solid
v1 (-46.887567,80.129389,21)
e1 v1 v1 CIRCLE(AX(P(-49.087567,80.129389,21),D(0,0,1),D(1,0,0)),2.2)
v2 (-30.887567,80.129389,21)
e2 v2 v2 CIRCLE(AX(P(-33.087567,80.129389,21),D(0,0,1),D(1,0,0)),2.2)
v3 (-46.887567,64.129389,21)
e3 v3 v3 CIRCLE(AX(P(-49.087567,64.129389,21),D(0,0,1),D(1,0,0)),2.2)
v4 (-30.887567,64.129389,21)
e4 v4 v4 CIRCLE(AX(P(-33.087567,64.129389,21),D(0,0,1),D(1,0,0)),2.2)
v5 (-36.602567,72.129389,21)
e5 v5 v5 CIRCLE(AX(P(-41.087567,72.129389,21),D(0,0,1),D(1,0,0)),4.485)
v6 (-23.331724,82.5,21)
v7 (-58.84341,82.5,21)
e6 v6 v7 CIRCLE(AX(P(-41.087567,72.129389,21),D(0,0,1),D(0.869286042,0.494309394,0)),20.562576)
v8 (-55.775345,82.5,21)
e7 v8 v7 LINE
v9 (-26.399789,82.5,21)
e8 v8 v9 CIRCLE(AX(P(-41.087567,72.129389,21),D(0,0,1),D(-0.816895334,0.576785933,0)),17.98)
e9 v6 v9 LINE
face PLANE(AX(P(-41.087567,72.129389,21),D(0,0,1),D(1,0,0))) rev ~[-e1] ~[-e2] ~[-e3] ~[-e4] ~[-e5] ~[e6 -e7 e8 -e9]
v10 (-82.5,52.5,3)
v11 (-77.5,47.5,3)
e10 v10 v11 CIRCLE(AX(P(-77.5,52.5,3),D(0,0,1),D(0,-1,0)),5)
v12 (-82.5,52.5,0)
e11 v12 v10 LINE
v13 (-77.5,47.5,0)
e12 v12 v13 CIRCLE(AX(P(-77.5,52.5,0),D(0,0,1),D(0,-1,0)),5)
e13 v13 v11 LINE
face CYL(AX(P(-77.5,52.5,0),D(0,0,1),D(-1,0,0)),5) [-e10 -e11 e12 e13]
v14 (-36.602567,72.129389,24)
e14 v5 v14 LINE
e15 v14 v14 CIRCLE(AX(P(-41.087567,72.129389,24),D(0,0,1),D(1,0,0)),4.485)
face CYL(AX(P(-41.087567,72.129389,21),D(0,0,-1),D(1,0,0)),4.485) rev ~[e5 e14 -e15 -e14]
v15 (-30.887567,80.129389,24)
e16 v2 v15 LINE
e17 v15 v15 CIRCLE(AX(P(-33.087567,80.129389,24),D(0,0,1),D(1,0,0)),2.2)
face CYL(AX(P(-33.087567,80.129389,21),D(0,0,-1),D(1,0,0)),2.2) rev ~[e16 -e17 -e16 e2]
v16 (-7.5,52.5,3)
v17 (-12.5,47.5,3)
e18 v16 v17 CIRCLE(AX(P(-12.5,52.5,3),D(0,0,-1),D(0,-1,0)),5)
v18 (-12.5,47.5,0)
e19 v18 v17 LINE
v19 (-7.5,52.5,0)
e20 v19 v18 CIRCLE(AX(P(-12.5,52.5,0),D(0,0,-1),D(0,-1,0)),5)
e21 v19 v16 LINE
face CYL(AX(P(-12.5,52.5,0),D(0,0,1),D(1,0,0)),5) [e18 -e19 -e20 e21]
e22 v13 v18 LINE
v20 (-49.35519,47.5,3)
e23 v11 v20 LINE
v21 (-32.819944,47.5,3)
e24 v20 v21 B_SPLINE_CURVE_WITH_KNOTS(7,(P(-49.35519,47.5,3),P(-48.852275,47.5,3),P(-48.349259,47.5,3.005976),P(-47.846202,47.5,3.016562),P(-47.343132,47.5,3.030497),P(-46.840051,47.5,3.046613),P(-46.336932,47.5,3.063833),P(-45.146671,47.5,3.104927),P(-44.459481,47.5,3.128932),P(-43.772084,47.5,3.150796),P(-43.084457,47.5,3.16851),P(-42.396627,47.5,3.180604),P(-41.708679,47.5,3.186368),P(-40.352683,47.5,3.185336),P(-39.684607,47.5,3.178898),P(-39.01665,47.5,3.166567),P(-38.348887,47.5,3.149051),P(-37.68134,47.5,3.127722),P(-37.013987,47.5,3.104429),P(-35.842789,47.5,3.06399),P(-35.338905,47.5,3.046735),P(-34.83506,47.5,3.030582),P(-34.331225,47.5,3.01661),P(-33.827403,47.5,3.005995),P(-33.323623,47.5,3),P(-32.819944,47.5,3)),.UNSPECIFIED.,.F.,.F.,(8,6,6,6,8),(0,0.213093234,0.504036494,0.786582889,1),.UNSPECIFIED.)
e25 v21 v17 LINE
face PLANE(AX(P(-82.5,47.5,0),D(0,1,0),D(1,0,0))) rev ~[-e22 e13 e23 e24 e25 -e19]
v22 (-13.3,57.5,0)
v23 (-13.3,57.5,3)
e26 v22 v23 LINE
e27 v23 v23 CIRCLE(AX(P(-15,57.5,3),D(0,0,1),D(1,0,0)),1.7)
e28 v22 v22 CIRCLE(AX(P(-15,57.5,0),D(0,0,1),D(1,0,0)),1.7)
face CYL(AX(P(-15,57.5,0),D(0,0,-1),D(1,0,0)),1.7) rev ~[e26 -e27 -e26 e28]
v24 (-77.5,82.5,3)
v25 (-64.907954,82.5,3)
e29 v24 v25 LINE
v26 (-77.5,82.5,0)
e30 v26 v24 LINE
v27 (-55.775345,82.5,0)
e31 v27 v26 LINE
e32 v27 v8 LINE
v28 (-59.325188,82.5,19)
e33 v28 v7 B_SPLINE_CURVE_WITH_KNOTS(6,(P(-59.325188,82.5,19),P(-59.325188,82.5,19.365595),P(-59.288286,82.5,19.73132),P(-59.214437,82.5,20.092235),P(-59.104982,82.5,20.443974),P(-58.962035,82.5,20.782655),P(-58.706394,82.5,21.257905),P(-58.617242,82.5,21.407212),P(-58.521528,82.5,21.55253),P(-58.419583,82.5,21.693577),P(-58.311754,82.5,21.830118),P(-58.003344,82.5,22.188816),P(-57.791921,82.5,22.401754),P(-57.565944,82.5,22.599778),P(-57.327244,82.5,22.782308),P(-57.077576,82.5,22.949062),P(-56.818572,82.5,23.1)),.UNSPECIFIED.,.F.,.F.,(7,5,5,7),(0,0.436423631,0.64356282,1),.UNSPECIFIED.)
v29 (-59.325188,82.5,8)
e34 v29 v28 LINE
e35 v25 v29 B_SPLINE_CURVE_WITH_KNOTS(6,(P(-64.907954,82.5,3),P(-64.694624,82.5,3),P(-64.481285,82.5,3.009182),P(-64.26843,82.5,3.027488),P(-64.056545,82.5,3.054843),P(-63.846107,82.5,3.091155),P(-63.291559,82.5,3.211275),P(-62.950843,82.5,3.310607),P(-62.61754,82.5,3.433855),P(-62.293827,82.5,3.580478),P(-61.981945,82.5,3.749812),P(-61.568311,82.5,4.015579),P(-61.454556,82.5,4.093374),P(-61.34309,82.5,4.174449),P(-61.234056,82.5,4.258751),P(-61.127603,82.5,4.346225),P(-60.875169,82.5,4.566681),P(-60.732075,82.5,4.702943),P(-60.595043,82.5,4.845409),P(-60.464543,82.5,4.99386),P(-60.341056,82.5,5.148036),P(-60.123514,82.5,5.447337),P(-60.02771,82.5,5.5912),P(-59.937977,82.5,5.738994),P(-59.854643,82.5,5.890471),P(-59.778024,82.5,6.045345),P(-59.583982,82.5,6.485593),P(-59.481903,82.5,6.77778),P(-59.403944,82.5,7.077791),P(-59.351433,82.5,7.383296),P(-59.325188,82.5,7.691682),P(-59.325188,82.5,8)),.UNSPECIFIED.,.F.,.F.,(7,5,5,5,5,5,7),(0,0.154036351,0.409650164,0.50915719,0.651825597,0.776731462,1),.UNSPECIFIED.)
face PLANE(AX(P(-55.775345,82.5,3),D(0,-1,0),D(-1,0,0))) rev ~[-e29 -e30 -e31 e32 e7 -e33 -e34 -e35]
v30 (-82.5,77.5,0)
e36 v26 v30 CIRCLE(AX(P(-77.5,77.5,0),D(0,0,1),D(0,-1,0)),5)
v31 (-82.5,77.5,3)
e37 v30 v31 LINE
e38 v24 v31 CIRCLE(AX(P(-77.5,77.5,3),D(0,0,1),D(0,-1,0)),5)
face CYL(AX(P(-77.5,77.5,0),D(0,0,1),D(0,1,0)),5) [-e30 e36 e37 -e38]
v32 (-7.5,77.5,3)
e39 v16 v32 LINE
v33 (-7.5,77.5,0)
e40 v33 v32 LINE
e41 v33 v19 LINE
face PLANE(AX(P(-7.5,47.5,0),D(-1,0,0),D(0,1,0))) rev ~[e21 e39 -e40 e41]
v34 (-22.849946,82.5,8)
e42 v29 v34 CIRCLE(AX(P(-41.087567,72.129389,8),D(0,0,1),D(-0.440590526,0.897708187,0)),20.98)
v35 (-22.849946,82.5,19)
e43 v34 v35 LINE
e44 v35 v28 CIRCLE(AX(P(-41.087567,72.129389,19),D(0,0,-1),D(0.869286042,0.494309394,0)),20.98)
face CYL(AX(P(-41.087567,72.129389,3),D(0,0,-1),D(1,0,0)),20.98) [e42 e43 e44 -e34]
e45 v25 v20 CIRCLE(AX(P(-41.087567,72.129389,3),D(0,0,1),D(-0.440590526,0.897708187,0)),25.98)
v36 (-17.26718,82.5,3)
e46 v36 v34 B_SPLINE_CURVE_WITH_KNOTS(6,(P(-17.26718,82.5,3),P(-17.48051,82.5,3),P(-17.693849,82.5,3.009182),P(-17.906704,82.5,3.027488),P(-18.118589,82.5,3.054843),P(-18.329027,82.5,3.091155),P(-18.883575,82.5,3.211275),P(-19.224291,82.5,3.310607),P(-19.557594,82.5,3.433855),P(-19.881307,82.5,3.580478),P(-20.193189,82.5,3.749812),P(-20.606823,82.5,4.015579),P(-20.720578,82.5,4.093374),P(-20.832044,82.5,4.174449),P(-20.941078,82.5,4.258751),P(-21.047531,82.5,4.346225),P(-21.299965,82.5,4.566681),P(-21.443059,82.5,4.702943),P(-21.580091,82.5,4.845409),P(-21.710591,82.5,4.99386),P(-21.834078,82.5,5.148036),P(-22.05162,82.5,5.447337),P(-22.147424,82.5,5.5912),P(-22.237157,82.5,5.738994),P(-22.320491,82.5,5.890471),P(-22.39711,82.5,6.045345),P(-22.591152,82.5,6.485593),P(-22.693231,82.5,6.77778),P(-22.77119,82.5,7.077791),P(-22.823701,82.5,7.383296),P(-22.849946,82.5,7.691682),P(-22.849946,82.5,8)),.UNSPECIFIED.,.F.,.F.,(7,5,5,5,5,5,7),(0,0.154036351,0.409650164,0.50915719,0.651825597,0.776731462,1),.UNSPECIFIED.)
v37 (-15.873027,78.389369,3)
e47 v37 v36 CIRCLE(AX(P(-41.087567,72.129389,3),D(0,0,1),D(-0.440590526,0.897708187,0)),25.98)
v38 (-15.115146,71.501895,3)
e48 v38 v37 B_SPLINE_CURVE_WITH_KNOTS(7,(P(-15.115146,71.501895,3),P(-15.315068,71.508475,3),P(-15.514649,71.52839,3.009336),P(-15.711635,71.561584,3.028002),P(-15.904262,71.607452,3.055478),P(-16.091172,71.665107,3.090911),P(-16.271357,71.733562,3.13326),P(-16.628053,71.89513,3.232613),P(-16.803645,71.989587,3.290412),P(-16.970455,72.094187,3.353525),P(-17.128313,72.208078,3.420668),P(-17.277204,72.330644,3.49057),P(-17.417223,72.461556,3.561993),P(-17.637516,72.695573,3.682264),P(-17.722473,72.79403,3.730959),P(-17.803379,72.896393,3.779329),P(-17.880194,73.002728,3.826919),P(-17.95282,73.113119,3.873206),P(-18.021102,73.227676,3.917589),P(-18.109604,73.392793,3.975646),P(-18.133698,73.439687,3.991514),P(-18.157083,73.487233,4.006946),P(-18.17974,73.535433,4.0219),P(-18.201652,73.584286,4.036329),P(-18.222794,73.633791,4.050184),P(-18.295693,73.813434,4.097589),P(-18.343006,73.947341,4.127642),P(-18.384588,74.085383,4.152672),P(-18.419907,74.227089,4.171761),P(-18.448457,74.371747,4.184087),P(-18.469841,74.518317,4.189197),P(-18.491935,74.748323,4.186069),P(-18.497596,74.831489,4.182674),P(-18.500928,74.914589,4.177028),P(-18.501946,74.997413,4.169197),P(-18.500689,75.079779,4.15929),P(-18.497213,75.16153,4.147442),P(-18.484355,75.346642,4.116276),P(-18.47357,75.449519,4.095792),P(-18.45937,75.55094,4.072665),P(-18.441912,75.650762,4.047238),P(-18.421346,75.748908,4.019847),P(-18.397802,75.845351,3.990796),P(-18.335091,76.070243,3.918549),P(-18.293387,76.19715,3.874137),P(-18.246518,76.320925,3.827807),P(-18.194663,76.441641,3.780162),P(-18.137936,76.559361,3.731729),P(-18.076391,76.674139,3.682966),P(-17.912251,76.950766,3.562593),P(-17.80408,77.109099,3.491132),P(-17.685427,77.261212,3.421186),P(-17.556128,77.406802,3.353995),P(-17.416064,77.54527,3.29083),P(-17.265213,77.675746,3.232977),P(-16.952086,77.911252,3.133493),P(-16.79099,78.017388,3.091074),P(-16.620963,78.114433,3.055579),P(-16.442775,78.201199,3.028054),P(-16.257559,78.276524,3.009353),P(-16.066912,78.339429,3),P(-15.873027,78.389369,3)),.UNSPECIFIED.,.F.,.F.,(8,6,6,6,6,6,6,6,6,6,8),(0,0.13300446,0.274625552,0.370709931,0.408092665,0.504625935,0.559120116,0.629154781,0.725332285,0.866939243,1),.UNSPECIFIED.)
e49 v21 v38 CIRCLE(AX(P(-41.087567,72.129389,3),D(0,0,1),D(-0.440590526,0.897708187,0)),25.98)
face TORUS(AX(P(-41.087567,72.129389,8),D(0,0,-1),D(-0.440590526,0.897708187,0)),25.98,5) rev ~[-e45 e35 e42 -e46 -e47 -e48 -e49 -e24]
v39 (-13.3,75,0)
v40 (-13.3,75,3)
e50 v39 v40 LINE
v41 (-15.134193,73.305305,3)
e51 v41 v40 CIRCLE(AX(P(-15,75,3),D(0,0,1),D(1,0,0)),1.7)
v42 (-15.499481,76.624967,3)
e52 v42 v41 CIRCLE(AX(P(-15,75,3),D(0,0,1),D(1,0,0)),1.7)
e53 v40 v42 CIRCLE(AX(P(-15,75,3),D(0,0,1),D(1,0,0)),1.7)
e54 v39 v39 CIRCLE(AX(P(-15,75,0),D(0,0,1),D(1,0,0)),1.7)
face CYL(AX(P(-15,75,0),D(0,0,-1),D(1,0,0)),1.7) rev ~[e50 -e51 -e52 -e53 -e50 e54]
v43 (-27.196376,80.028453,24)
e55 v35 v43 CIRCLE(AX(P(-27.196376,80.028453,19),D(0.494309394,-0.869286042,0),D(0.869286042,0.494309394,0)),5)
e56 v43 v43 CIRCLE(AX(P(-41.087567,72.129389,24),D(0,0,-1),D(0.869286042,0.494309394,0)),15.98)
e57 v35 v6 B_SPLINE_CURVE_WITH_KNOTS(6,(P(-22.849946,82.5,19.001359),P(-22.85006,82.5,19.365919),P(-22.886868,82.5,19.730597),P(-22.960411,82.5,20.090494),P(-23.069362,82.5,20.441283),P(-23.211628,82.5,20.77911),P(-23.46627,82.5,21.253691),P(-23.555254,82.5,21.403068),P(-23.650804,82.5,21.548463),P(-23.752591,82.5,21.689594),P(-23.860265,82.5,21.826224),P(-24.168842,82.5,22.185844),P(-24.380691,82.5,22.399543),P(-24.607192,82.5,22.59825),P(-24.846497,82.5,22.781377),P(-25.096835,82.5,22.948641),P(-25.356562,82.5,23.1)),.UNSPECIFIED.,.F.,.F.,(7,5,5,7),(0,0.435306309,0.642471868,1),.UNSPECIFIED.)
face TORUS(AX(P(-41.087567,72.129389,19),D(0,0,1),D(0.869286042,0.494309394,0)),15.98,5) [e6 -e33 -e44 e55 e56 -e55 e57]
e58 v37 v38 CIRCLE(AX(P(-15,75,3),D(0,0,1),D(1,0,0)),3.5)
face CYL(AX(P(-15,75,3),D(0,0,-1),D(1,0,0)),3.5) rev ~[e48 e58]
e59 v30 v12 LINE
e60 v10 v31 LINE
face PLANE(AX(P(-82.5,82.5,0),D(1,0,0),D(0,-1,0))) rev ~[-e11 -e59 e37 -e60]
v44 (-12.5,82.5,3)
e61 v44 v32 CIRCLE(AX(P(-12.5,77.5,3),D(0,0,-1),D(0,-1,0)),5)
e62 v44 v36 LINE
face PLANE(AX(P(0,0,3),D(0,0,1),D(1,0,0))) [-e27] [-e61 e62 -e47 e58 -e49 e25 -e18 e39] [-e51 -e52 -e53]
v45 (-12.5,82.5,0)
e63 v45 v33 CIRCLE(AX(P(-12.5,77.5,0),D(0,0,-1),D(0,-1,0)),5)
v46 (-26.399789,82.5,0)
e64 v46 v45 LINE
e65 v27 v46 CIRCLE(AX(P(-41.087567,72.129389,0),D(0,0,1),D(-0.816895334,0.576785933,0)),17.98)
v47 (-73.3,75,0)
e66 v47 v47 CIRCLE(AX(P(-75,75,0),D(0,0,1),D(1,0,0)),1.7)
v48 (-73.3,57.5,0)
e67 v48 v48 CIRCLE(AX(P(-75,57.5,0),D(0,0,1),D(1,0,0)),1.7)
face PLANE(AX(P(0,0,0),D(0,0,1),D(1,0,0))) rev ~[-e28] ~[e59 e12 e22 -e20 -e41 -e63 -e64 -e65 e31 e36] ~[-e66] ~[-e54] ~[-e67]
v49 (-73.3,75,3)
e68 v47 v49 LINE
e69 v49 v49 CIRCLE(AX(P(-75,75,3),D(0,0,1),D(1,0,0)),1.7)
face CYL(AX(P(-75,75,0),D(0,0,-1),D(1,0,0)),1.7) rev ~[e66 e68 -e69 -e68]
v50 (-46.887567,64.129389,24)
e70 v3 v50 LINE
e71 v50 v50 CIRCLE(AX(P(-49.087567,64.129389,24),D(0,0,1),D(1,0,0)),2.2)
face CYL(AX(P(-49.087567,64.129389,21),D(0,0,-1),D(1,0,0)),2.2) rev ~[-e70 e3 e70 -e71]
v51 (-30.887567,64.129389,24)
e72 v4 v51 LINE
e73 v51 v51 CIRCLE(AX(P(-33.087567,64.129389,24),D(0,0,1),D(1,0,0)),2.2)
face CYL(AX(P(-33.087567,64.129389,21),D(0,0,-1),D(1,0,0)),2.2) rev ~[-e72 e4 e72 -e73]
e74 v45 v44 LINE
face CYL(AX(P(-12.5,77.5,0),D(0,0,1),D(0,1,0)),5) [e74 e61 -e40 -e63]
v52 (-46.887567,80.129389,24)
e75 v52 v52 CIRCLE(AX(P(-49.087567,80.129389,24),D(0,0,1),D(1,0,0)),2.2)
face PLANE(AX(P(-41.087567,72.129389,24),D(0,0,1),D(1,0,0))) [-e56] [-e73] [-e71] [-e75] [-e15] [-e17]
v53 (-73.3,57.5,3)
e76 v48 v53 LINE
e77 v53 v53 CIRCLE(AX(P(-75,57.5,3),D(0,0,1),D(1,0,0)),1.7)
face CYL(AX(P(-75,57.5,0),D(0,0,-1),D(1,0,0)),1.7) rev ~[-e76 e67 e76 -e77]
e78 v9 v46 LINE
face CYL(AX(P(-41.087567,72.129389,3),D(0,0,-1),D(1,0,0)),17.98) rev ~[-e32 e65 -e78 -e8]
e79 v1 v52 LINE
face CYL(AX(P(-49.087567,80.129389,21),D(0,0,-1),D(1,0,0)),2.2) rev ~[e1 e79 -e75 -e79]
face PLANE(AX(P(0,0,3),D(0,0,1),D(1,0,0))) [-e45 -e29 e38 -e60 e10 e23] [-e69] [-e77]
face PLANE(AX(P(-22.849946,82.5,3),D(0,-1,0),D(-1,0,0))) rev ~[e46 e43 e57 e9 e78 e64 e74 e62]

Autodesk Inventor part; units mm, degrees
ref_plane "YZ Plane" through (0, 0, 0) normal (1, 0, 0) x (0, 1, 0)
ref_plane "XZ Plane" through (0, 0, 0) normal (0, 1, 0) x (-1, 0, 0)
sketch "Sketch1" plane through (0, 0, 0) normal (0, 0, 1) x (1, 0, 0)
  circle A0 centre (-15, 75) radius 1.7
  circle A1 centre (-15, 57.5) radius 1.7
  circle A2 centre (-75, 75) radius 1.7
  circle A3 centre (-75, 57.5) radius 1.7
  line L0 (-67.5, 62.5) -> (-67.5, 82.5)
  arc A4 (-67.5, 62.5) -> (-57.5, 52.5) centre (-57.5, 62.5) ccw
  line L1 (-32.5, 52.5) -> (-57.5, 52.5)
  arc A5 (-32.5, 52.5) -> (-22.5, 62.5) centre (-32.5, 62.5) ccw
  line L2 (-22.5, 82.5) -> (-22.5, 62.5)
  line L3 (-7.5, 82.5) -> (-22.5, 82.5)
  line L4 (-7.5, 62.5) -> (-7.5, 82.5)
  line L5 (-67.5, 82.5) -> (-82.5, 82.5)
  line L6 (-82.5, 82.5) -> (-82.5, -37.5)
  line L7 (-82.5, 52.5) -> (-57.5, 52.5)
  line L8 (-32.5, 52.5) -> (-7.5, 52.5)
  line L9 (-7.5, 52.5) -> (-7.5, 62.5)
  circle A6 centre (-41.087567, 72.129389) radius 17.98
  line L10 (-67.5, 82.5) -> (-55.775345, 82.5)
  line L11 (-22.5, 82.5) -> (-26.399789, 82.5)
  line L12 (-7.5, 52.5) -> (-82.5, 52.5)
  line L13 (-82.5, 52.5) -> (-82.5, 47.5)
  line L14 (-82.5, 47.5) -> (-7.5, 47.5)
  line L15 (-7.5, 47.5) -> (-7.5, 52.5)
  point P0 (0, 0)
  point P1 (-22.296102, 67.952867)
  dimension "d2" = 5
extrude "Extrusion1" add sketch "Sketch1" along normal blind 3 contours A4 L7 L6 L5 L0 | L0 L10 A6 L11 L2 A5 L1 A4 | L1 L8 L15 L14 L6 L7 | A5 L2 L3 L4 L9 L8
sketch "Sketch2" plane through (0, 0, 3) normal (0, 0, 1) x (1, 0, 0)
  circle A0 centre (-41.087567, 72.129389) radius 17.98
  line L0 (-55.775345, 82.5) -> (-82.5, 82.5)
  line L1 (-7.5, 82.5) -> (-26.399789, 82.5)
  circle A1 centre (-41.087567, 72.129389) radius 20.98
  point P0 (0, 0)
  point P1 (-59.325188, 82.5)
  point P2 (-22.849946, 82.5)
  dimension "d3" = 3
ref_plane "Work Plane1" through (-53.798179, 52.016597, 21) normal (0, 0, 1) x (0.817541, 0.5758704, 0)
extrude "Extrusion2" add sketch "Sketch2" along normal up to surface (18 mm away) contours A0 L1 A1 L0 picked at (-21.478975, 69.046328)
sketch "Sketch3" plane through (-41.087567, 72.129389, 21) normal (0, 0, 1) x (1, 0, 0)
  arc A0 (-18.237621, 10.370611) -> (18.237621, 10.370611) centre (0, 0) ccw
  circle A1 centre (0, 0) radius 4.485
  arc A2 (-14.687778, 10.370611) -> (14.687778, 10.370611) centre (0, 0) ccw construction
  line L0 (0, 0) -> (11.25, 0) construction
  line L1 (8, 0) -> (8, -8) construction
  line L2 (0, 0) -> (0, -11.25) construction
  circle A3 centre (8, -8) radius 2.2
  circle A4 centre (-8, -8) radius 2.2
  circle A5 centre (0, 0) radius 20.98
  circle A6 centre (8, 8) radius 2.2
  circle A7 centre (-8, 8) radius 2.2
  point P0 (41.087567, -72.129389)
  point P1 (18.237621, 10.370611)
  point P2 (-18.237621, 10.370611)
  dimension "d6" = 8
  dimension "d7" = 4.4
  dimension "d20" = 16
  dimension "d21" = 8
extrude "Extrusion3" add sketch "Sketch3" along normal blind 3
fillet "Fillet1" radius 5 4 edges at (-82.5, 82.5, 1.5) (-82.5, 47.5, 1.5) (-7.5, 47.5, 1.5) (-7.5, 82.5, 1.5)
fillet "Fillet2" radius 5 1 edges at (-41.0876, 51.1494, 3)
fillet "Fillet3" radius 5 1 edges at (-59.3252, 61.7588, 24)
sketch "Sketch4" plane through (0, 0, 3) normal (0, 0, 1) x (1, 0, 0)
  circle A0 centre (-15, 57.5) radius 1.7
  arc A1 (-15.134193, 73.305305) -> (-15.499481, 76.624967) centre (-15, 75) ccw
  circle A2 centre (-75, 75) radius 1.7
  circle A3 centre (-75, 57.5) radius 1.7
  circle A4 centre (-15, 57.5) radius 3.5
  circle A5 centre (-75, 57.5) radius 3.5
  circle A6 centre (-75, 75) radius 3.5
  circle A7 centre (-15, 75) radius 1.7
  circle A8 centre (-15, 75) radius 3.5
  point P0 (0, 0)
  dimension "d13" = 7
  dimension "d14" = 7
  dimension "d15" = 7
  dimension "d16" = 7
extrude "Extrusion4" cut sketch "Sketch4" along normal blind 3
properties part number "Rex Motor Bracket"
